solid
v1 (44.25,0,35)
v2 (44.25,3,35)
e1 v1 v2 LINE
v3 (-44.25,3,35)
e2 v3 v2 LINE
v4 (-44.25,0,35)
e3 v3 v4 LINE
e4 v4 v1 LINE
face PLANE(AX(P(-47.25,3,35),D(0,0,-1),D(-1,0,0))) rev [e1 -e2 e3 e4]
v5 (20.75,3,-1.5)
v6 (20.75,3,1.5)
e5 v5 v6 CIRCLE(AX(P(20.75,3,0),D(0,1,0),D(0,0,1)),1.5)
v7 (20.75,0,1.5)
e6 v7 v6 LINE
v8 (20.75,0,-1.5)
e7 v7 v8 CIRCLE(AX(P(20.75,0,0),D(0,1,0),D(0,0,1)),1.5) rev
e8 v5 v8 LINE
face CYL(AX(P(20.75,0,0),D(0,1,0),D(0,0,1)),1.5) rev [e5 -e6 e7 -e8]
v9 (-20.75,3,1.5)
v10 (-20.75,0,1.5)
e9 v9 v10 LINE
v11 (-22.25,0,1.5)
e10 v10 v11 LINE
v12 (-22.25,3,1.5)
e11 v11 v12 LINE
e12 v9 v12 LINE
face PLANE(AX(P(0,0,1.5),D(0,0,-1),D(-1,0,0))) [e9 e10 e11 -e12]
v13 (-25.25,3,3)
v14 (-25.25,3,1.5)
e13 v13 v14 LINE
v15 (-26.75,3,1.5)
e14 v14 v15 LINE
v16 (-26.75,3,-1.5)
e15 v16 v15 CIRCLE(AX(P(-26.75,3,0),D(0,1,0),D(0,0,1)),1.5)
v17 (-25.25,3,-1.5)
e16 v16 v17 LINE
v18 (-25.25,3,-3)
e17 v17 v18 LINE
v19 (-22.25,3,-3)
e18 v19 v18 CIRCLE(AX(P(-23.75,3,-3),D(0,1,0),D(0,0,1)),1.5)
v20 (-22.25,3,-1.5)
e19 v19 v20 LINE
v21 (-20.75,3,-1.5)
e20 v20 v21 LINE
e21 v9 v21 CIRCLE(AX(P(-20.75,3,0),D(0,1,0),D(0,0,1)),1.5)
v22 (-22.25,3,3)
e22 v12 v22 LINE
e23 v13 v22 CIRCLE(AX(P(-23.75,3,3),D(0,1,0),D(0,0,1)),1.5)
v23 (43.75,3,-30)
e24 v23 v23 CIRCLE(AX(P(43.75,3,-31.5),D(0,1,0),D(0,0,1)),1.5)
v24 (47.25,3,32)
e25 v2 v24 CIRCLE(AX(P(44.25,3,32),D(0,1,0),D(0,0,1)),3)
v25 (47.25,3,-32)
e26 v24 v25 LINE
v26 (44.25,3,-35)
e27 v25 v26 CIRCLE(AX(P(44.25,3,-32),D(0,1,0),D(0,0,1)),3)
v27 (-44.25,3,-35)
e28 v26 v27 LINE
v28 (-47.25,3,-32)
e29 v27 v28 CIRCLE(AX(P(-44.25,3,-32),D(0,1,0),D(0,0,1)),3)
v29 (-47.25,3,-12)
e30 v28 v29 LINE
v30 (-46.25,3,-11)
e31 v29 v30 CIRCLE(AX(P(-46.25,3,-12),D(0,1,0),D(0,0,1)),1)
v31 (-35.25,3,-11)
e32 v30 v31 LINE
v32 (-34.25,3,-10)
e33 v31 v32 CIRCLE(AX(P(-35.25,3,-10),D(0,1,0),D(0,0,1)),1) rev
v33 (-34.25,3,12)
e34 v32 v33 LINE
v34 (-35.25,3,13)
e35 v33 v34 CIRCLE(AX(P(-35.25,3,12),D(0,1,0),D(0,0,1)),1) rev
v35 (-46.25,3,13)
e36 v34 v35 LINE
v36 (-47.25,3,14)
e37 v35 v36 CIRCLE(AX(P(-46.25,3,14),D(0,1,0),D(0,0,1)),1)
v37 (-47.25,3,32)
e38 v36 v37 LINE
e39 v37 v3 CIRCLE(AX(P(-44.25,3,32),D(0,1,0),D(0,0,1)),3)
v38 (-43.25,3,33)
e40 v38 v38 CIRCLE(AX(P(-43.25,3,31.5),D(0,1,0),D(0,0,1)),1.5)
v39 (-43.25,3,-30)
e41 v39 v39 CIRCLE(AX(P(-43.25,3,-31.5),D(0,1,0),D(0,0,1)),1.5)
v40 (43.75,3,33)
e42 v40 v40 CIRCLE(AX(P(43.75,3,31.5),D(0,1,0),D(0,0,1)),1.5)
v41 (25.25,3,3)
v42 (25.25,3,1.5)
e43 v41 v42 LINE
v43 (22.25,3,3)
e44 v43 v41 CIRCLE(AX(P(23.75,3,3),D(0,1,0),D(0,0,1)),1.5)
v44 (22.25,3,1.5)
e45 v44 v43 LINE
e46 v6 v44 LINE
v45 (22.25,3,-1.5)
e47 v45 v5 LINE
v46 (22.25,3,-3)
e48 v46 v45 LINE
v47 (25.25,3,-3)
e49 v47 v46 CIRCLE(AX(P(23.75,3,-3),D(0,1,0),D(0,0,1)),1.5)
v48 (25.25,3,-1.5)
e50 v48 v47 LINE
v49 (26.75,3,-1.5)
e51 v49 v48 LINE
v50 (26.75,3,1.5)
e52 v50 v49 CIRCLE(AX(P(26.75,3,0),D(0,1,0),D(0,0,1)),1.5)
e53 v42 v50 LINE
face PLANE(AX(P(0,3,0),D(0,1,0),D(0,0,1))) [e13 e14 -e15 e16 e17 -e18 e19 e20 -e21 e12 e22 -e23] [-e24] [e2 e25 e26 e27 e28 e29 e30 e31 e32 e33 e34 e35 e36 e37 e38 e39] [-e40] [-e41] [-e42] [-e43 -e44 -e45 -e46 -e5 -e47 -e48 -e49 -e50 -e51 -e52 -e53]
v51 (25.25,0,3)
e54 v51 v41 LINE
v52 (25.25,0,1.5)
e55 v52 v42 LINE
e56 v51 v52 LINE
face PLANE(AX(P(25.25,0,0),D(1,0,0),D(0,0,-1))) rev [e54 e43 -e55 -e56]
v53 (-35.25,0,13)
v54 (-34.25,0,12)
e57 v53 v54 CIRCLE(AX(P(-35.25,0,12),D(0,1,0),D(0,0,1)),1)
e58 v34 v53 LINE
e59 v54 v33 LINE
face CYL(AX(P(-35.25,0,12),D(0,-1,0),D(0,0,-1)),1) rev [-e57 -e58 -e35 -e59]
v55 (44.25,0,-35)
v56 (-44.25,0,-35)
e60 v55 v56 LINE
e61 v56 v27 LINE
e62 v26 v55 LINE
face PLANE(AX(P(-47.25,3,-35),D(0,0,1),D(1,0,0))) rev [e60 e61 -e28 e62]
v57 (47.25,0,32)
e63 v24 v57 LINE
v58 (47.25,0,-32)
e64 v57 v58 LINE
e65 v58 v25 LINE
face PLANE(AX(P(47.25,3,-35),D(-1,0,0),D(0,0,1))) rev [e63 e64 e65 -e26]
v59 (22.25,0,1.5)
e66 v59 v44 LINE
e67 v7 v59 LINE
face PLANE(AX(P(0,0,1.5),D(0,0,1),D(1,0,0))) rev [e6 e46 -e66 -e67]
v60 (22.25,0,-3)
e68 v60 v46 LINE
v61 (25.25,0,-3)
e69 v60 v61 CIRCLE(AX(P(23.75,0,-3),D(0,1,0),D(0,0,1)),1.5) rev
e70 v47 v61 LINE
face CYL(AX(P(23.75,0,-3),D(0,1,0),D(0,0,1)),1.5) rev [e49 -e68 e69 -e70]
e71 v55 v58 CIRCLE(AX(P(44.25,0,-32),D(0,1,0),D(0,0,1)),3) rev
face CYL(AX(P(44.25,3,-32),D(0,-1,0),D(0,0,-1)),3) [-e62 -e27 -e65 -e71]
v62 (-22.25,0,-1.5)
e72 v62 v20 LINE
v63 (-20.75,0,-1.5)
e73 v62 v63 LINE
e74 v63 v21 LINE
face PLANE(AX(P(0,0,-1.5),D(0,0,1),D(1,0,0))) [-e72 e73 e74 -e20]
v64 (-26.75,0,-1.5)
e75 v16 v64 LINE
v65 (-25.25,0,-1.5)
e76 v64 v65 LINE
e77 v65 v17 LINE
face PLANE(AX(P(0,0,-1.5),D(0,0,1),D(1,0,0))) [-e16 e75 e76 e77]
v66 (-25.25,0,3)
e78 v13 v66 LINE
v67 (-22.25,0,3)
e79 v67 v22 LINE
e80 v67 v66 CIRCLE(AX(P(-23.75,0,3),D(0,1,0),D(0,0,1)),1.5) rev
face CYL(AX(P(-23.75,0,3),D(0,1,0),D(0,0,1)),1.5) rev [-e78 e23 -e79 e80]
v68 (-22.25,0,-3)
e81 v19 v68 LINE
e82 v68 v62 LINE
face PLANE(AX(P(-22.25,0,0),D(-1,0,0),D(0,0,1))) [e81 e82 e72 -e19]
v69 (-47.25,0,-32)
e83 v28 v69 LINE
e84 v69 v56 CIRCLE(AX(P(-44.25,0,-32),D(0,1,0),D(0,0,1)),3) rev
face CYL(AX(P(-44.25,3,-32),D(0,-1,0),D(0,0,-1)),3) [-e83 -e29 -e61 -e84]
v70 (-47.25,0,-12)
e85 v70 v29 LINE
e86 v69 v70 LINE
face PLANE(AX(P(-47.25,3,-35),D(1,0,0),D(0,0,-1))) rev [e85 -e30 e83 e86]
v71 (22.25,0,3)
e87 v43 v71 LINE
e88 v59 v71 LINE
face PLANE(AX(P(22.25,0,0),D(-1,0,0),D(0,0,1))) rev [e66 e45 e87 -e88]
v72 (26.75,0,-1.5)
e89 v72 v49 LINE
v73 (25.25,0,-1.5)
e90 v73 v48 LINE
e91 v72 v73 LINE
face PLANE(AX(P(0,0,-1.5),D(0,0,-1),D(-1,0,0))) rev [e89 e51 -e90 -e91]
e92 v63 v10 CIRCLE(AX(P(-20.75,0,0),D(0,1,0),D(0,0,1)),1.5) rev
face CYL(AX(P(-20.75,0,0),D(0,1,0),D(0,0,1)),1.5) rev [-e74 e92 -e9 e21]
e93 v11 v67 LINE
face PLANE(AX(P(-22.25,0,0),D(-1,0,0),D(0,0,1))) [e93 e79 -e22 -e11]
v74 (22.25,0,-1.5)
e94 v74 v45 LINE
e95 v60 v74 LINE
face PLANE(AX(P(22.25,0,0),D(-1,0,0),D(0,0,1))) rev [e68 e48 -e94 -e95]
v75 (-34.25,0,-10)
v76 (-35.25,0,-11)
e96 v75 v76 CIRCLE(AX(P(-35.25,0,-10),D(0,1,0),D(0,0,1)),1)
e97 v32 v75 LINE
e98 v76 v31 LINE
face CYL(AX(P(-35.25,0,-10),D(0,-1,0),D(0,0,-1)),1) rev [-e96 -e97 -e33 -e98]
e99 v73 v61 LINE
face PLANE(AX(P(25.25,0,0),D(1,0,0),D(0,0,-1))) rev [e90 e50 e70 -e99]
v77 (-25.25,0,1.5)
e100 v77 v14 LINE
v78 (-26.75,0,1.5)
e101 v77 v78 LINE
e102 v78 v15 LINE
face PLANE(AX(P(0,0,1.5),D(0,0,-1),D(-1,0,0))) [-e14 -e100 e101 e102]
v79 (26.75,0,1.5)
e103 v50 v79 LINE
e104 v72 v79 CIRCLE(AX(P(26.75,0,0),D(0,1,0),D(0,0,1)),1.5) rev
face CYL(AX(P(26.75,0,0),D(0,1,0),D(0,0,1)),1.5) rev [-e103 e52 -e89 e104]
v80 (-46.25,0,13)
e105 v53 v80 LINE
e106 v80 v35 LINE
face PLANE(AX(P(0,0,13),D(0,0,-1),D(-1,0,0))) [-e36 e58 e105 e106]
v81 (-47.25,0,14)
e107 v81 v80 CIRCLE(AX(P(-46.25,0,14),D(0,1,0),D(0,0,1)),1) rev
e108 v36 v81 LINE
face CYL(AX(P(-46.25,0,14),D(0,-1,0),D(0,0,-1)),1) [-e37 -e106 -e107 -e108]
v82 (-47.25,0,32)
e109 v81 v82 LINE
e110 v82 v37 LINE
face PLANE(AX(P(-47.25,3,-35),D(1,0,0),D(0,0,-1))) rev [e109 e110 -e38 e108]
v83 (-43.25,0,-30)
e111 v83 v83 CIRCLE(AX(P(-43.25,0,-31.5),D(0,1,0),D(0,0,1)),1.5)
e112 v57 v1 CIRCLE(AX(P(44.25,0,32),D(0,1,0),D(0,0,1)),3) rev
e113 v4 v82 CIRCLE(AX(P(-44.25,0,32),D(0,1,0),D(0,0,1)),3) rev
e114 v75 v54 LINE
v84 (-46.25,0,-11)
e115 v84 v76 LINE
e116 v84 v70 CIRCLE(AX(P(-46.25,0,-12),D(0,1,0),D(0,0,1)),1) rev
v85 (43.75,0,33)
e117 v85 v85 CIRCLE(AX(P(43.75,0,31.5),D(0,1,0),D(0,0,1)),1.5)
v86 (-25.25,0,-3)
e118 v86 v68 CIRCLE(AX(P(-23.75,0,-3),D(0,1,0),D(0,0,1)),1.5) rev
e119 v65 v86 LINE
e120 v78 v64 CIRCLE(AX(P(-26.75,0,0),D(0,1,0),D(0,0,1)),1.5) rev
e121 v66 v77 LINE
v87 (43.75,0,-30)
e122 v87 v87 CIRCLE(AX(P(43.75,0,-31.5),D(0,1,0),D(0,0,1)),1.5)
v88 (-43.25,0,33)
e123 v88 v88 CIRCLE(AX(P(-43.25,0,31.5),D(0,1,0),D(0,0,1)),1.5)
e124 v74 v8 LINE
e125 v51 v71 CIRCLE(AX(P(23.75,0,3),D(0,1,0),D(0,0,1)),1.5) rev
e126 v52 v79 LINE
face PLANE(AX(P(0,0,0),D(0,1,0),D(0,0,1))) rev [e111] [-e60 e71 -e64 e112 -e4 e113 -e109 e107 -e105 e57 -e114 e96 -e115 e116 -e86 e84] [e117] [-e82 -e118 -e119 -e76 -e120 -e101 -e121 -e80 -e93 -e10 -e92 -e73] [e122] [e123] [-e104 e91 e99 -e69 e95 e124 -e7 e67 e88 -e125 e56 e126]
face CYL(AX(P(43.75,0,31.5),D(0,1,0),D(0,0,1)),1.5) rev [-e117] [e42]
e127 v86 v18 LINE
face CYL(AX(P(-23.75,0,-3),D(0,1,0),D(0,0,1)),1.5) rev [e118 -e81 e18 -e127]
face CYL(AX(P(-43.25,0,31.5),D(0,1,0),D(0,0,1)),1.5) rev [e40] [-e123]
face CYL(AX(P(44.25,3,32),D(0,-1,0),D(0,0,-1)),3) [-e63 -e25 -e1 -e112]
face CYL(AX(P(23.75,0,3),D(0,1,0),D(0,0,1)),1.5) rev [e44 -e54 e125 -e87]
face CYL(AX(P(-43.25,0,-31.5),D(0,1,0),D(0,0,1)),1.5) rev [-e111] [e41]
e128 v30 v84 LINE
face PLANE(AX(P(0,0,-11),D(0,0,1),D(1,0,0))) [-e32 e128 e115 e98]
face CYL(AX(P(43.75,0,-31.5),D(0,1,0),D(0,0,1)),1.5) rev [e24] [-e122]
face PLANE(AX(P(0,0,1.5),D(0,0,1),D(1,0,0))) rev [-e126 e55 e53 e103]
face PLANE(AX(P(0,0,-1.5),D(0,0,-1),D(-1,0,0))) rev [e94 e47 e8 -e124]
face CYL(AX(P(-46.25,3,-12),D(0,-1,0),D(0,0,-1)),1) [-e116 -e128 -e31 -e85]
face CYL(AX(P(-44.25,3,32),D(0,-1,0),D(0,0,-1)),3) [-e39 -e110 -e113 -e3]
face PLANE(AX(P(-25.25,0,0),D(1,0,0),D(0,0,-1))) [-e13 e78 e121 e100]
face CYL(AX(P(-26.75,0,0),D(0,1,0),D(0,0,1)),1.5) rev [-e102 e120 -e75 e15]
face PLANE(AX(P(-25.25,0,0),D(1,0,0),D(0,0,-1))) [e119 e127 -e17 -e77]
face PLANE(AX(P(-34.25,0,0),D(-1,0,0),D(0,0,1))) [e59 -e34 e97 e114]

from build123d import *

# Parameters (mm, degrees)
SKETCH1_W           = 94.5
SKETCH1_H           = 70
BOSS_EXTRUDE1_DEPTH = 3
SKETCH3_R           = 1.5
CUT_EXTRUDE2_DEPTH  = 59.877521177
FILLET2_R           = 3
SKETCH5_W           = 13
SKETCH5_H           = 24
CUT_EXTRUDE3_DEPTH  = 59.877521177
FILLET3_R           = 1
FILLET5_R           = 1.5
FILLET6_R           = 1.5
FILLET7_R           = 1.5
FILLET8_R           = 1.5
FILLET9_R           = 1.5
FILLET10_R          = 1.5
FILLET11_R          = 1.5
FILLET12_R          = 1.5


with BuildPart() as part:
    # Sketch1 → Boss-Extrude1 (new body)
    with BuildSketch(Plane(origin=(0, 0, 0), x_dir=(1, 0, 0), z_dir=(0, 1, 0))):
        Rectangle(SKETCH1_W, SKETCH1_H)
    extrude(amount=BOSS_EXTRUDE1_DEPTH)

    # Sketch3 → Cut-Extrude2 (cut, through all)
    with BuildSketch(Plane(origin=(0, 3, 0), x_dir=(1, 0, 0), z_dir=(0, 1, 0))):
        with Locations(Location((43.75, 31.5, 0), (0, 0, 270))):
            Circle(SKETCH3_R)
        with Locations(Location((-43.25, 31.5, 0), (0, 0, 270))):
            Circle(SKETCH3_R)
        with Locations(Location((-43.25, -31.5, 0), (0, 0, 270))):
            Circle(SKETCH3_R)
        with Locations(Location((43.75, -31.5, 0), (0, 0, 270))):
            Circle(SKETCH3_R)
    extrude(amount=-CUT_EXTRUDE2_DEPTH, mode=Mode.SUBTRACT)

    # Fillet2
    fillet2_edges = [part.edges().sort_by_distance(p)[0] for p in [
        (47.25, 1.5, 35),
        (-47.25, 1.5, 35),
        (-47.25, 1.5, -35),
        (47.25, 1.5, -35),
    ]]
    fillet(fillet2_edges, radius=FILLET2_R)

    # Sketch5 → Cut-Extrude3 (cut, through all)
    with BuildSketch(Plane(origin=(0, 3, 0), x_dir=(1, 0, 0), z_dir=(0, 1, 0))):
        with Locations((-40.75, -1)):
            Rectangle(SKETCH5_W, SKETCH5_H)
        Polygon((-25.25, 1.5), (-25.25, 4.5), (-22.25, 4.5), (-22.25, 1.5), (-19.25, 1.5), (-19.25, -1.5), (-22.25, -1.5), (-22.25, -4.5), (-25.25, -4.5), (-25.25, -1.5), (-28.25, -1.5), (-28.25, 1.5), align=None)
        Polygon((25.25, 1.5), (25.25, 4.5), (22.25, 4.5), (22.25, 1.5), (19.25, 1.5), (19.25, -1.5), (22.25, -1.5), (22.25, -4.5), (25.25, -4.5), (25.25, -1.5), (28.25, -1.5), (28.25, 1.5), align=None)
    extrude(amount=-CUT_EXTRUDE3_DEPTH, mode=Mode.SUBTRACT)

    # Fillet3
    fillet3_edges = [part.edges().sort_by_distance(p)[0] for p in [
        (-34.25, 1.5, 13),
        (-47.25, 1.5, 13),
        (-47.25, 1.5, -11),
        (-34.25, 1.5, -11),
    ]]
    fillet(fillet3_edges, radius=FILLET3_R)

    # Fillet5
    fillet5_edges = [part.edges().sort_by_distance(p)[0] for p in [
        (-25.25, 1.5, -4.5),
        (-22.25, 1.5, -4.5),
    ]]
    fillet(fillet5_edges, radius=FILLET5_R - 0.0001)  # a hair under: the kernel refuses the full size

    # Fillet6
    fillet6_edges = [part.edges().sort_by_distance(p)[0] for p in [
        (-28.25, 1.5, 1.5),
        (-28.25, 1.5, -1.5),
    ]]
    fillet(fillet6_edges, radius=FILLET6_R - 0.0001)  # a hair under: the kernel refuses the full size

    # Fillet7
    fillet7_edges = [part.edges().sort_by_distance(p)[0] for p in [
        (-19.25, 1.5, -1.5),
        (-19.25, 1.5, 1.5),
    ]]
    fillet(fillet7_edges, radius=FILLET7_R - 0.0001)  # a hair under: the kernel refuses the full size

    # Fillet8
    fillet8_edges = [part.edges().sort_by_distance(p)[0] for p in [
        (-22.25, 1.5, 4.5),
        (-25.25, 1.5, 4.5),
    ]]
    fillet(fillet8_edges, radius=FILLET8_R - 0.0001)  # a hair under: the kernel refuses the full size

    # Fillet9
    fillet9_edges = [part.edges().sort_by_distance(p)[0] for p in [
        (25.25, 1.5, -4.5),
        (22.25, 1.5, -4.5),
    ]]
    fillet(fillet9_edges, radius=FILLET9_R - 0.0001)  # a hair under: the kernel refuses the full size

    # Fillet10
    fillet10_edges = [part.edges().sort_by_distance(p)[0] for p in [
        (28.25, 1.5, -1.5),
        (28.25, 1.5, 1.5),
    ]]
    fillet(fillet10_edges, radius=FILLET10_R - 0.0001)  # a hair under: the kernel refuses the full size

    # Fillet11
    fillet11_edges = [part.edges().sort_by_distance(p)[0] for p in [
        (25.25, 1.5, 4.5),
        (22.25, 1.5, 4.5),
    ]]
    fillet(fillet11_edges, radius=FILLET11_R - 0.0001)  # a hair under: the kernel refuses the full size

    # Fillet12
    fillet12_edges = [part.edges().sort_by_distance(p)[0] for p in [
        (19.25, 1.5, 1.5),
        (19.25, 1.5, -1.5),
    ]]
    fillet(fillet12_edges, radius=FILLET12_R - 0.0001)  # a hair under: the kernel refuses the full size


solid = part.part
